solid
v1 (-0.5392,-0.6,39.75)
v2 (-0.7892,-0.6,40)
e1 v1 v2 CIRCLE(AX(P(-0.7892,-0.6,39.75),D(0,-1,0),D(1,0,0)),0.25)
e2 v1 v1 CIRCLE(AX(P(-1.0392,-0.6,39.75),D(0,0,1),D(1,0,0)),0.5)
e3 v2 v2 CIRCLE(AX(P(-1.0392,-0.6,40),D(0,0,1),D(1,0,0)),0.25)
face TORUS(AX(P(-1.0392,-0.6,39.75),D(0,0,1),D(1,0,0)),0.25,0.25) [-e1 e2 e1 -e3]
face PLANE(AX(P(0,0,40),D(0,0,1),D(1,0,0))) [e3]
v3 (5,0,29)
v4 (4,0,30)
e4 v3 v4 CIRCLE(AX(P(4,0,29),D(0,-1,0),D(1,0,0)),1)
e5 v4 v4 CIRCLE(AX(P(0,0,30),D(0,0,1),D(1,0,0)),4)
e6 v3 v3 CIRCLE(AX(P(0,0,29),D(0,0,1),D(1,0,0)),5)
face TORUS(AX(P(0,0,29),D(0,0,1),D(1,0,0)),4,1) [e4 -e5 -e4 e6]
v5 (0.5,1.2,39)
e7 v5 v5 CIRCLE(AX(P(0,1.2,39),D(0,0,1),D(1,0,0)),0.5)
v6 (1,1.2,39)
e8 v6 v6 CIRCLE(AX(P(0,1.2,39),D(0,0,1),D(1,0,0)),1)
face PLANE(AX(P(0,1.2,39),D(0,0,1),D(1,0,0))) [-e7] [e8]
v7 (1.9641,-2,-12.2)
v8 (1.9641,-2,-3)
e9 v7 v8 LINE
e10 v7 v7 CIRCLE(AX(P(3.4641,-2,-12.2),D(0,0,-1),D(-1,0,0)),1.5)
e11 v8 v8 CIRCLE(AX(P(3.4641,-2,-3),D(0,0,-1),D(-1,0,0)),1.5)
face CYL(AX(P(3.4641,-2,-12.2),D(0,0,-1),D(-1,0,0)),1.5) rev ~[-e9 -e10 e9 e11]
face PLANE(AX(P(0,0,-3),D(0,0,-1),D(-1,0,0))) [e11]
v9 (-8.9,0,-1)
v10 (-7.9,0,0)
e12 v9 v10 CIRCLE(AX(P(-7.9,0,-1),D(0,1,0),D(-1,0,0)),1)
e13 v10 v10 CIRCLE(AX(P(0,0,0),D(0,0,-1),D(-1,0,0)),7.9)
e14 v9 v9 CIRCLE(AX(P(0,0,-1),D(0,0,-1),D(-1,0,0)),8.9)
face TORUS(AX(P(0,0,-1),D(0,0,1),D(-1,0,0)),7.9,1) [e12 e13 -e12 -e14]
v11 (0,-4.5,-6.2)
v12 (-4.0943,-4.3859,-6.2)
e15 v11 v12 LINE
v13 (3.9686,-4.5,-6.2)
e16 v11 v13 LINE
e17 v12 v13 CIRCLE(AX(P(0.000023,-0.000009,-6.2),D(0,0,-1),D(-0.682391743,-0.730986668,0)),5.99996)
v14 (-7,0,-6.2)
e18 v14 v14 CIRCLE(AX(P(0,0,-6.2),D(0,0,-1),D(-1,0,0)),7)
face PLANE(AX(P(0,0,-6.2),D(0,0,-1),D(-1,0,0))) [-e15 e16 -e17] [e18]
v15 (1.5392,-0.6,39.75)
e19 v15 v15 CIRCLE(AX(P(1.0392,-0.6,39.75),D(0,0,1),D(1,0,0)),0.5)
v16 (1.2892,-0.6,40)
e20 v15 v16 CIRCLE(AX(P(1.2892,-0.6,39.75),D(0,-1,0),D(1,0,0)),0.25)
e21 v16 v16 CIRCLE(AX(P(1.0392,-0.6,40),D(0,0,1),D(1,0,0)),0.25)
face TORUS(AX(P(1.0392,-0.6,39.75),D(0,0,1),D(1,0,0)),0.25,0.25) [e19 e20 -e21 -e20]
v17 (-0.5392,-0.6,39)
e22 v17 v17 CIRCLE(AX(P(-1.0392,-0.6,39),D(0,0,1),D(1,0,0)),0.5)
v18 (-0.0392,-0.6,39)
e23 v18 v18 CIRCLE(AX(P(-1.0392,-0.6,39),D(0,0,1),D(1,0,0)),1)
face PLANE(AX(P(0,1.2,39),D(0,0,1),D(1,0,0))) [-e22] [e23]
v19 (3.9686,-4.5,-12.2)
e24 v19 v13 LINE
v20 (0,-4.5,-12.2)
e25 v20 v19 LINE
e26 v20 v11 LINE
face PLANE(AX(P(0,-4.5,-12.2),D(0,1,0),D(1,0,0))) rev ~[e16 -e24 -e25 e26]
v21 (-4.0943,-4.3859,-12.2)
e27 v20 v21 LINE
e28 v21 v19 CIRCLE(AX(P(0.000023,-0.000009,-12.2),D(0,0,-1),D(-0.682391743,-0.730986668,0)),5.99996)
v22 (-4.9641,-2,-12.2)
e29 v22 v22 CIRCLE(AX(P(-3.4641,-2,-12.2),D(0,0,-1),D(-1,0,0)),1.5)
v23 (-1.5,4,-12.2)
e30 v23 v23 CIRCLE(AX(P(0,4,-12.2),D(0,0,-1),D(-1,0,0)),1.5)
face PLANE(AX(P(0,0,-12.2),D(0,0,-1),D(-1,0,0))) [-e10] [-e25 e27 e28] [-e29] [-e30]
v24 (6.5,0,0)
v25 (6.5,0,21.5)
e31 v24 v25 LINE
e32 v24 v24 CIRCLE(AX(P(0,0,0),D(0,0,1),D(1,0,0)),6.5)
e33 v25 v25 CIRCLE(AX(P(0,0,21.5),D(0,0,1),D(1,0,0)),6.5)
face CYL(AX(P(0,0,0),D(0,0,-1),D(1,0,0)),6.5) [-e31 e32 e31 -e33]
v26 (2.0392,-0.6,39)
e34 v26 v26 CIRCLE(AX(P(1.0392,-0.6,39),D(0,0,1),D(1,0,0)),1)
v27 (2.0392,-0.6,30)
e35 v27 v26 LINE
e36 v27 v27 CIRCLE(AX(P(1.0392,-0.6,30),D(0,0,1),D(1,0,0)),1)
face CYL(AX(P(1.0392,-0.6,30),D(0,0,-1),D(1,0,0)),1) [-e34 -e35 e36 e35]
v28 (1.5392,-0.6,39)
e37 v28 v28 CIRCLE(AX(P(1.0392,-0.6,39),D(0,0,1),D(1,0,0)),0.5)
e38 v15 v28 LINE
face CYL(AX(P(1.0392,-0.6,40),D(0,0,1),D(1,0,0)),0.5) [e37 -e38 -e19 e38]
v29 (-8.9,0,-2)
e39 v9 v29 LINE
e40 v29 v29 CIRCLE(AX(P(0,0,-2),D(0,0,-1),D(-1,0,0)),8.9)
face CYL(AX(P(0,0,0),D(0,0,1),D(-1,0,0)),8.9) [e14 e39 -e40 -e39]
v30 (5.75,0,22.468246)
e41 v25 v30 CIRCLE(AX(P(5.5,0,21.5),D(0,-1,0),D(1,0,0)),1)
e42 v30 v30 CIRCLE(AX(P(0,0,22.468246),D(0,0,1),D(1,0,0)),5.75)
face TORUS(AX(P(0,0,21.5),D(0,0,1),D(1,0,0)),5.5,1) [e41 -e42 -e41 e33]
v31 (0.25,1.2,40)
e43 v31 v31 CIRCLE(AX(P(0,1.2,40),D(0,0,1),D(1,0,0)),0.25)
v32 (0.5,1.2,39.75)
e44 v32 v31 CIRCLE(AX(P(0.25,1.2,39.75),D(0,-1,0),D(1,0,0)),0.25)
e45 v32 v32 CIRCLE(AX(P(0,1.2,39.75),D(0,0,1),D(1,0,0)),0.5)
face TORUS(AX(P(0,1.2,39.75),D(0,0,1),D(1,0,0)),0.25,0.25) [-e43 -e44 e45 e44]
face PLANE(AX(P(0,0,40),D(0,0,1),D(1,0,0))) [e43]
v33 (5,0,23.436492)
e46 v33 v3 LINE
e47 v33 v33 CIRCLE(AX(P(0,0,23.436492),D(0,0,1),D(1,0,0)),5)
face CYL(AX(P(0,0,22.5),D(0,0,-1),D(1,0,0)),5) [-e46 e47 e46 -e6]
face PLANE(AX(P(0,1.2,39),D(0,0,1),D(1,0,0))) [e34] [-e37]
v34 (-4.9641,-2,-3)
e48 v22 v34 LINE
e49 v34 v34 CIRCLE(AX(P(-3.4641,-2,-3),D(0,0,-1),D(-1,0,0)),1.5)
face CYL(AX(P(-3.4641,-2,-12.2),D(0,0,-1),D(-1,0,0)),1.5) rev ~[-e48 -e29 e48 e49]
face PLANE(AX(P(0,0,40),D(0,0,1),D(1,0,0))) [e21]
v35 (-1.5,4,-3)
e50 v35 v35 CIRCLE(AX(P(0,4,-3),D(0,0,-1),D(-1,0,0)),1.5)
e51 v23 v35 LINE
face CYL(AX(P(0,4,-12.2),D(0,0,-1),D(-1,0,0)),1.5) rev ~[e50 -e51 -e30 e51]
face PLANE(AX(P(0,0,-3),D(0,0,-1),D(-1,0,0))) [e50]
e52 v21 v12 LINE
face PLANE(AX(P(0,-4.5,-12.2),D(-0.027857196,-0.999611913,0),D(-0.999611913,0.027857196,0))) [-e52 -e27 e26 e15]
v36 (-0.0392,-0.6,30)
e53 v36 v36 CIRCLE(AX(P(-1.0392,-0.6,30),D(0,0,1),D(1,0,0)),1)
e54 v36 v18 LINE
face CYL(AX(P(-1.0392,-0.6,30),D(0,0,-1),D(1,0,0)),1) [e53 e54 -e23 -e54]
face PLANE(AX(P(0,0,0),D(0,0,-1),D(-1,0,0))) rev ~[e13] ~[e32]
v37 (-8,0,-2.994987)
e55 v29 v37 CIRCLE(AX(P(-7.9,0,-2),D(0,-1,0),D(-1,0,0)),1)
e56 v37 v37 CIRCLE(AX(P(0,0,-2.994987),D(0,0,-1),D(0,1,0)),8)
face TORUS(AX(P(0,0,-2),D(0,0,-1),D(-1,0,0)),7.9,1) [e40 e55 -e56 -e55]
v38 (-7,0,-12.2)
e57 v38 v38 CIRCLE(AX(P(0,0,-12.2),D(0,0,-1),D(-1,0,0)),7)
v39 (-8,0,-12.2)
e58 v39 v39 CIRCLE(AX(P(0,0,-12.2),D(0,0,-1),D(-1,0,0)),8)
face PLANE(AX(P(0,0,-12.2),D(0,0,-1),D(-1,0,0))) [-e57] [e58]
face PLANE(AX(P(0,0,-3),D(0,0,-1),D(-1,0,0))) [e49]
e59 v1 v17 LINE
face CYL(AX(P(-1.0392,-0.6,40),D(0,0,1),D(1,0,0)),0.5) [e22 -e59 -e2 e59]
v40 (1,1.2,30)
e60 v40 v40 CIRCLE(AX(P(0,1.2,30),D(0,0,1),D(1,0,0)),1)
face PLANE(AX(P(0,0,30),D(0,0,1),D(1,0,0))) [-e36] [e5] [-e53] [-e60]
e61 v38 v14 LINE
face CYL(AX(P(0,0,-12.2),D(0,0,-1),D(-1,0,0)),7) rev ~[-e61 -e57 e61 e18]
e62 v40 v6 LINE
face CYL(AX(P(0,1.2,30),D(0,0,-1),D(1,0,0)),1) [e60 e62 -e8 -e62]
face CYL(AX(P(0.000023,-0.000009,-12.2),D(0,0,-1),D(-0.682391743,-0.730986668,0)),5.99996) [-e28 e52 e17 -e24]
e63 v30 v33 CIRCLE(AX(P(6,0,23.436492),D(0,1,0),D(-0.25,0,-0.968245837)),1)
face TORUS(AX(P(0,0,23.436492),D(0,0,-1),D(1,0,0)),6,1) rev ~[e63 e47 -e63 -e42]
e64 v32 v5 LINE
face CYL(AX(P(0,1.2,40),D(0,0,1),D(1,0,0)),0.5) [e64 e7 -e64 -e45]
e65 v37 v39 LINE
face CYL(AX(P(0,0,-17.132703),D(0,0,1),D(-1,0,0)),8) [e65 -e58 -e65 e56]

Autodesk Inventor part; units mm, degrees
ref_plane "YZ Plane" through (0, 0, 0) normal (1, 0, 0) x (0, 1, 0)
ref_plane "XZ Plane" through (0, 0, 0) normal (0, 1, 0) x (-1, 0, 0)
ref_plane "XY Plane" through (0, 0, 0) normal (0, 0, 1) x (1, 0, 0)
sketch "Sketch1" plane through (0, 0, 0) normal (0, 0, 1) x (1, 0, 0)
  circle A0 centre (0, 0) radius 6.5
  dimension "d0" = 13
extrude "Extrusion1" add sketch "Sketch1" along normal blind 22.5
sketch "Sketch2" plane through (0, 0, 22.5) normal (0, 0, 1) x (1, 0, 0)
  circle A0 centre (0, 0) radius 5
  dimension "d3" = 10
extrude "Extrusion2" add sketch "Sketch2" along normal blind 7.5
fillet "Fillet1" radius 1 3 edges at (-6.5, 0, 22.5) (-5, 0, 30) (-5, 0, 22.5)
sketch "Sketch3" plane through (0, 0, 0) normal (0, 0, -1) x (-1, 0, 0)
  circle A0 centre (0, 0) radius 8.9
  dimension "d7" = 17.8
extrude "Extrusion3" add sketch "Sketch3" along normal blind 3
sketch "Sketch4" plane through (0, 0, -3) normal (0, 0, -1) x (-1, 0, 0)
  circle A0 centre (0, 0) radius 8
  dimension "d10" = 16
extrude "Extrusion4" add sketch "Sketch4" along normal blind 9.2
fillet "Fillet2" radius 1 2 edges at (8.9, 0, 0) (8.9, 0, -3)
thread "Thread1" size "M16x2" class "6g" standard "ANSI Metric M Profile" full length
sketch "Sketch5" plane through (0, 0, -12.2) normal (0, 0, -1) x (-1, 0, 0)
  circle A0 centre (0, 0) radius 4 construction
  circle A1 centre (0, 4) radius 1.5
  circle A2 centre (-3.4641, -2) radius 1.5
  circle A3 centre (3.4641, -2) radius 1.5
  dimension "d16" = 8
  dimension "d17" = 3
  dimension "d20" = 360
extrude "Extrusion5" cut sketch "Sketch5" against normal blind 9.2
sketch "Sketch6" plane through (0, 0, 30) normal (0, 0, 1) x (1, 0, 0)
  line L0 (0, 0) -> (0, 1.2)
  circle A0 centre (0, 1.2) radius 1
  circle A1 centre (-1.0392, -0.6) radius 1
  circle A2 centre (1.0392, -0.6) radius 1
  dimension "d24" = 1.2
  dimension "d25" = 2
  dimension "d28" = 360
extrude "Extrusion6" add sketch "Sketch6" along normal blind 10
sketch "Sketch7" plane through (0, 1.2, 40) normal (0, 0, 1) x (1, 0, 0)
  circle A0 centre (0, 0) radius 1 construction
  circle A1 centre (1.0392, -1.8) radius 1 construction
  circle A2 centre (-1.0392, -1.8) radius 1 construction
  circle A3 centre (0, 0) radius 0.5
  circle A4 centre (1.0392, -1.8) radius 0.5
  circle A5 centre (-1.0392, -1.8) radius 0.5
  circle A6 centre (-1.0392, -1.8) radius 1
  circle A7 centre (1.0392, -1.8) radius 1
  circle A8 centre (0, 0) radius 1
  point P0 (0, -1.2)
  dimension "d32" = 1
  dimension "d33" = 1
  dimension "d34" = 1
extrude "Extrusion7" cut sketch "Sketch7" against normal blind 1
fillet "Fillet3" radius 0.25 3 edges at (-0.5, 1.2, 40) (-1.5392, -0.6, 40) (0.5392, -0.6, 40)
sketch "Sketch8" plane through (0, 0, -12.2) normal (0, 0, -1) x (-1, 0, 0)
  arc A0 (4.0943, -4.3859) -> (-3.9686, -4.5) centre (0, 0) ccw
  circle A1 centre (0, 0) radius 7
  line L0 (0, -4.5) -> (-3.9686, -4.5)
  line L1 (0, -4.5) -> (4.0943, -4.3859)
  dimension "d38" = 12
  dimension "d39" = 14
extrude "Extrusion8" cut sketch "Sketch8" against normal blind 6
equation "\"d35\" = d34"
properties part number "12vplug"
